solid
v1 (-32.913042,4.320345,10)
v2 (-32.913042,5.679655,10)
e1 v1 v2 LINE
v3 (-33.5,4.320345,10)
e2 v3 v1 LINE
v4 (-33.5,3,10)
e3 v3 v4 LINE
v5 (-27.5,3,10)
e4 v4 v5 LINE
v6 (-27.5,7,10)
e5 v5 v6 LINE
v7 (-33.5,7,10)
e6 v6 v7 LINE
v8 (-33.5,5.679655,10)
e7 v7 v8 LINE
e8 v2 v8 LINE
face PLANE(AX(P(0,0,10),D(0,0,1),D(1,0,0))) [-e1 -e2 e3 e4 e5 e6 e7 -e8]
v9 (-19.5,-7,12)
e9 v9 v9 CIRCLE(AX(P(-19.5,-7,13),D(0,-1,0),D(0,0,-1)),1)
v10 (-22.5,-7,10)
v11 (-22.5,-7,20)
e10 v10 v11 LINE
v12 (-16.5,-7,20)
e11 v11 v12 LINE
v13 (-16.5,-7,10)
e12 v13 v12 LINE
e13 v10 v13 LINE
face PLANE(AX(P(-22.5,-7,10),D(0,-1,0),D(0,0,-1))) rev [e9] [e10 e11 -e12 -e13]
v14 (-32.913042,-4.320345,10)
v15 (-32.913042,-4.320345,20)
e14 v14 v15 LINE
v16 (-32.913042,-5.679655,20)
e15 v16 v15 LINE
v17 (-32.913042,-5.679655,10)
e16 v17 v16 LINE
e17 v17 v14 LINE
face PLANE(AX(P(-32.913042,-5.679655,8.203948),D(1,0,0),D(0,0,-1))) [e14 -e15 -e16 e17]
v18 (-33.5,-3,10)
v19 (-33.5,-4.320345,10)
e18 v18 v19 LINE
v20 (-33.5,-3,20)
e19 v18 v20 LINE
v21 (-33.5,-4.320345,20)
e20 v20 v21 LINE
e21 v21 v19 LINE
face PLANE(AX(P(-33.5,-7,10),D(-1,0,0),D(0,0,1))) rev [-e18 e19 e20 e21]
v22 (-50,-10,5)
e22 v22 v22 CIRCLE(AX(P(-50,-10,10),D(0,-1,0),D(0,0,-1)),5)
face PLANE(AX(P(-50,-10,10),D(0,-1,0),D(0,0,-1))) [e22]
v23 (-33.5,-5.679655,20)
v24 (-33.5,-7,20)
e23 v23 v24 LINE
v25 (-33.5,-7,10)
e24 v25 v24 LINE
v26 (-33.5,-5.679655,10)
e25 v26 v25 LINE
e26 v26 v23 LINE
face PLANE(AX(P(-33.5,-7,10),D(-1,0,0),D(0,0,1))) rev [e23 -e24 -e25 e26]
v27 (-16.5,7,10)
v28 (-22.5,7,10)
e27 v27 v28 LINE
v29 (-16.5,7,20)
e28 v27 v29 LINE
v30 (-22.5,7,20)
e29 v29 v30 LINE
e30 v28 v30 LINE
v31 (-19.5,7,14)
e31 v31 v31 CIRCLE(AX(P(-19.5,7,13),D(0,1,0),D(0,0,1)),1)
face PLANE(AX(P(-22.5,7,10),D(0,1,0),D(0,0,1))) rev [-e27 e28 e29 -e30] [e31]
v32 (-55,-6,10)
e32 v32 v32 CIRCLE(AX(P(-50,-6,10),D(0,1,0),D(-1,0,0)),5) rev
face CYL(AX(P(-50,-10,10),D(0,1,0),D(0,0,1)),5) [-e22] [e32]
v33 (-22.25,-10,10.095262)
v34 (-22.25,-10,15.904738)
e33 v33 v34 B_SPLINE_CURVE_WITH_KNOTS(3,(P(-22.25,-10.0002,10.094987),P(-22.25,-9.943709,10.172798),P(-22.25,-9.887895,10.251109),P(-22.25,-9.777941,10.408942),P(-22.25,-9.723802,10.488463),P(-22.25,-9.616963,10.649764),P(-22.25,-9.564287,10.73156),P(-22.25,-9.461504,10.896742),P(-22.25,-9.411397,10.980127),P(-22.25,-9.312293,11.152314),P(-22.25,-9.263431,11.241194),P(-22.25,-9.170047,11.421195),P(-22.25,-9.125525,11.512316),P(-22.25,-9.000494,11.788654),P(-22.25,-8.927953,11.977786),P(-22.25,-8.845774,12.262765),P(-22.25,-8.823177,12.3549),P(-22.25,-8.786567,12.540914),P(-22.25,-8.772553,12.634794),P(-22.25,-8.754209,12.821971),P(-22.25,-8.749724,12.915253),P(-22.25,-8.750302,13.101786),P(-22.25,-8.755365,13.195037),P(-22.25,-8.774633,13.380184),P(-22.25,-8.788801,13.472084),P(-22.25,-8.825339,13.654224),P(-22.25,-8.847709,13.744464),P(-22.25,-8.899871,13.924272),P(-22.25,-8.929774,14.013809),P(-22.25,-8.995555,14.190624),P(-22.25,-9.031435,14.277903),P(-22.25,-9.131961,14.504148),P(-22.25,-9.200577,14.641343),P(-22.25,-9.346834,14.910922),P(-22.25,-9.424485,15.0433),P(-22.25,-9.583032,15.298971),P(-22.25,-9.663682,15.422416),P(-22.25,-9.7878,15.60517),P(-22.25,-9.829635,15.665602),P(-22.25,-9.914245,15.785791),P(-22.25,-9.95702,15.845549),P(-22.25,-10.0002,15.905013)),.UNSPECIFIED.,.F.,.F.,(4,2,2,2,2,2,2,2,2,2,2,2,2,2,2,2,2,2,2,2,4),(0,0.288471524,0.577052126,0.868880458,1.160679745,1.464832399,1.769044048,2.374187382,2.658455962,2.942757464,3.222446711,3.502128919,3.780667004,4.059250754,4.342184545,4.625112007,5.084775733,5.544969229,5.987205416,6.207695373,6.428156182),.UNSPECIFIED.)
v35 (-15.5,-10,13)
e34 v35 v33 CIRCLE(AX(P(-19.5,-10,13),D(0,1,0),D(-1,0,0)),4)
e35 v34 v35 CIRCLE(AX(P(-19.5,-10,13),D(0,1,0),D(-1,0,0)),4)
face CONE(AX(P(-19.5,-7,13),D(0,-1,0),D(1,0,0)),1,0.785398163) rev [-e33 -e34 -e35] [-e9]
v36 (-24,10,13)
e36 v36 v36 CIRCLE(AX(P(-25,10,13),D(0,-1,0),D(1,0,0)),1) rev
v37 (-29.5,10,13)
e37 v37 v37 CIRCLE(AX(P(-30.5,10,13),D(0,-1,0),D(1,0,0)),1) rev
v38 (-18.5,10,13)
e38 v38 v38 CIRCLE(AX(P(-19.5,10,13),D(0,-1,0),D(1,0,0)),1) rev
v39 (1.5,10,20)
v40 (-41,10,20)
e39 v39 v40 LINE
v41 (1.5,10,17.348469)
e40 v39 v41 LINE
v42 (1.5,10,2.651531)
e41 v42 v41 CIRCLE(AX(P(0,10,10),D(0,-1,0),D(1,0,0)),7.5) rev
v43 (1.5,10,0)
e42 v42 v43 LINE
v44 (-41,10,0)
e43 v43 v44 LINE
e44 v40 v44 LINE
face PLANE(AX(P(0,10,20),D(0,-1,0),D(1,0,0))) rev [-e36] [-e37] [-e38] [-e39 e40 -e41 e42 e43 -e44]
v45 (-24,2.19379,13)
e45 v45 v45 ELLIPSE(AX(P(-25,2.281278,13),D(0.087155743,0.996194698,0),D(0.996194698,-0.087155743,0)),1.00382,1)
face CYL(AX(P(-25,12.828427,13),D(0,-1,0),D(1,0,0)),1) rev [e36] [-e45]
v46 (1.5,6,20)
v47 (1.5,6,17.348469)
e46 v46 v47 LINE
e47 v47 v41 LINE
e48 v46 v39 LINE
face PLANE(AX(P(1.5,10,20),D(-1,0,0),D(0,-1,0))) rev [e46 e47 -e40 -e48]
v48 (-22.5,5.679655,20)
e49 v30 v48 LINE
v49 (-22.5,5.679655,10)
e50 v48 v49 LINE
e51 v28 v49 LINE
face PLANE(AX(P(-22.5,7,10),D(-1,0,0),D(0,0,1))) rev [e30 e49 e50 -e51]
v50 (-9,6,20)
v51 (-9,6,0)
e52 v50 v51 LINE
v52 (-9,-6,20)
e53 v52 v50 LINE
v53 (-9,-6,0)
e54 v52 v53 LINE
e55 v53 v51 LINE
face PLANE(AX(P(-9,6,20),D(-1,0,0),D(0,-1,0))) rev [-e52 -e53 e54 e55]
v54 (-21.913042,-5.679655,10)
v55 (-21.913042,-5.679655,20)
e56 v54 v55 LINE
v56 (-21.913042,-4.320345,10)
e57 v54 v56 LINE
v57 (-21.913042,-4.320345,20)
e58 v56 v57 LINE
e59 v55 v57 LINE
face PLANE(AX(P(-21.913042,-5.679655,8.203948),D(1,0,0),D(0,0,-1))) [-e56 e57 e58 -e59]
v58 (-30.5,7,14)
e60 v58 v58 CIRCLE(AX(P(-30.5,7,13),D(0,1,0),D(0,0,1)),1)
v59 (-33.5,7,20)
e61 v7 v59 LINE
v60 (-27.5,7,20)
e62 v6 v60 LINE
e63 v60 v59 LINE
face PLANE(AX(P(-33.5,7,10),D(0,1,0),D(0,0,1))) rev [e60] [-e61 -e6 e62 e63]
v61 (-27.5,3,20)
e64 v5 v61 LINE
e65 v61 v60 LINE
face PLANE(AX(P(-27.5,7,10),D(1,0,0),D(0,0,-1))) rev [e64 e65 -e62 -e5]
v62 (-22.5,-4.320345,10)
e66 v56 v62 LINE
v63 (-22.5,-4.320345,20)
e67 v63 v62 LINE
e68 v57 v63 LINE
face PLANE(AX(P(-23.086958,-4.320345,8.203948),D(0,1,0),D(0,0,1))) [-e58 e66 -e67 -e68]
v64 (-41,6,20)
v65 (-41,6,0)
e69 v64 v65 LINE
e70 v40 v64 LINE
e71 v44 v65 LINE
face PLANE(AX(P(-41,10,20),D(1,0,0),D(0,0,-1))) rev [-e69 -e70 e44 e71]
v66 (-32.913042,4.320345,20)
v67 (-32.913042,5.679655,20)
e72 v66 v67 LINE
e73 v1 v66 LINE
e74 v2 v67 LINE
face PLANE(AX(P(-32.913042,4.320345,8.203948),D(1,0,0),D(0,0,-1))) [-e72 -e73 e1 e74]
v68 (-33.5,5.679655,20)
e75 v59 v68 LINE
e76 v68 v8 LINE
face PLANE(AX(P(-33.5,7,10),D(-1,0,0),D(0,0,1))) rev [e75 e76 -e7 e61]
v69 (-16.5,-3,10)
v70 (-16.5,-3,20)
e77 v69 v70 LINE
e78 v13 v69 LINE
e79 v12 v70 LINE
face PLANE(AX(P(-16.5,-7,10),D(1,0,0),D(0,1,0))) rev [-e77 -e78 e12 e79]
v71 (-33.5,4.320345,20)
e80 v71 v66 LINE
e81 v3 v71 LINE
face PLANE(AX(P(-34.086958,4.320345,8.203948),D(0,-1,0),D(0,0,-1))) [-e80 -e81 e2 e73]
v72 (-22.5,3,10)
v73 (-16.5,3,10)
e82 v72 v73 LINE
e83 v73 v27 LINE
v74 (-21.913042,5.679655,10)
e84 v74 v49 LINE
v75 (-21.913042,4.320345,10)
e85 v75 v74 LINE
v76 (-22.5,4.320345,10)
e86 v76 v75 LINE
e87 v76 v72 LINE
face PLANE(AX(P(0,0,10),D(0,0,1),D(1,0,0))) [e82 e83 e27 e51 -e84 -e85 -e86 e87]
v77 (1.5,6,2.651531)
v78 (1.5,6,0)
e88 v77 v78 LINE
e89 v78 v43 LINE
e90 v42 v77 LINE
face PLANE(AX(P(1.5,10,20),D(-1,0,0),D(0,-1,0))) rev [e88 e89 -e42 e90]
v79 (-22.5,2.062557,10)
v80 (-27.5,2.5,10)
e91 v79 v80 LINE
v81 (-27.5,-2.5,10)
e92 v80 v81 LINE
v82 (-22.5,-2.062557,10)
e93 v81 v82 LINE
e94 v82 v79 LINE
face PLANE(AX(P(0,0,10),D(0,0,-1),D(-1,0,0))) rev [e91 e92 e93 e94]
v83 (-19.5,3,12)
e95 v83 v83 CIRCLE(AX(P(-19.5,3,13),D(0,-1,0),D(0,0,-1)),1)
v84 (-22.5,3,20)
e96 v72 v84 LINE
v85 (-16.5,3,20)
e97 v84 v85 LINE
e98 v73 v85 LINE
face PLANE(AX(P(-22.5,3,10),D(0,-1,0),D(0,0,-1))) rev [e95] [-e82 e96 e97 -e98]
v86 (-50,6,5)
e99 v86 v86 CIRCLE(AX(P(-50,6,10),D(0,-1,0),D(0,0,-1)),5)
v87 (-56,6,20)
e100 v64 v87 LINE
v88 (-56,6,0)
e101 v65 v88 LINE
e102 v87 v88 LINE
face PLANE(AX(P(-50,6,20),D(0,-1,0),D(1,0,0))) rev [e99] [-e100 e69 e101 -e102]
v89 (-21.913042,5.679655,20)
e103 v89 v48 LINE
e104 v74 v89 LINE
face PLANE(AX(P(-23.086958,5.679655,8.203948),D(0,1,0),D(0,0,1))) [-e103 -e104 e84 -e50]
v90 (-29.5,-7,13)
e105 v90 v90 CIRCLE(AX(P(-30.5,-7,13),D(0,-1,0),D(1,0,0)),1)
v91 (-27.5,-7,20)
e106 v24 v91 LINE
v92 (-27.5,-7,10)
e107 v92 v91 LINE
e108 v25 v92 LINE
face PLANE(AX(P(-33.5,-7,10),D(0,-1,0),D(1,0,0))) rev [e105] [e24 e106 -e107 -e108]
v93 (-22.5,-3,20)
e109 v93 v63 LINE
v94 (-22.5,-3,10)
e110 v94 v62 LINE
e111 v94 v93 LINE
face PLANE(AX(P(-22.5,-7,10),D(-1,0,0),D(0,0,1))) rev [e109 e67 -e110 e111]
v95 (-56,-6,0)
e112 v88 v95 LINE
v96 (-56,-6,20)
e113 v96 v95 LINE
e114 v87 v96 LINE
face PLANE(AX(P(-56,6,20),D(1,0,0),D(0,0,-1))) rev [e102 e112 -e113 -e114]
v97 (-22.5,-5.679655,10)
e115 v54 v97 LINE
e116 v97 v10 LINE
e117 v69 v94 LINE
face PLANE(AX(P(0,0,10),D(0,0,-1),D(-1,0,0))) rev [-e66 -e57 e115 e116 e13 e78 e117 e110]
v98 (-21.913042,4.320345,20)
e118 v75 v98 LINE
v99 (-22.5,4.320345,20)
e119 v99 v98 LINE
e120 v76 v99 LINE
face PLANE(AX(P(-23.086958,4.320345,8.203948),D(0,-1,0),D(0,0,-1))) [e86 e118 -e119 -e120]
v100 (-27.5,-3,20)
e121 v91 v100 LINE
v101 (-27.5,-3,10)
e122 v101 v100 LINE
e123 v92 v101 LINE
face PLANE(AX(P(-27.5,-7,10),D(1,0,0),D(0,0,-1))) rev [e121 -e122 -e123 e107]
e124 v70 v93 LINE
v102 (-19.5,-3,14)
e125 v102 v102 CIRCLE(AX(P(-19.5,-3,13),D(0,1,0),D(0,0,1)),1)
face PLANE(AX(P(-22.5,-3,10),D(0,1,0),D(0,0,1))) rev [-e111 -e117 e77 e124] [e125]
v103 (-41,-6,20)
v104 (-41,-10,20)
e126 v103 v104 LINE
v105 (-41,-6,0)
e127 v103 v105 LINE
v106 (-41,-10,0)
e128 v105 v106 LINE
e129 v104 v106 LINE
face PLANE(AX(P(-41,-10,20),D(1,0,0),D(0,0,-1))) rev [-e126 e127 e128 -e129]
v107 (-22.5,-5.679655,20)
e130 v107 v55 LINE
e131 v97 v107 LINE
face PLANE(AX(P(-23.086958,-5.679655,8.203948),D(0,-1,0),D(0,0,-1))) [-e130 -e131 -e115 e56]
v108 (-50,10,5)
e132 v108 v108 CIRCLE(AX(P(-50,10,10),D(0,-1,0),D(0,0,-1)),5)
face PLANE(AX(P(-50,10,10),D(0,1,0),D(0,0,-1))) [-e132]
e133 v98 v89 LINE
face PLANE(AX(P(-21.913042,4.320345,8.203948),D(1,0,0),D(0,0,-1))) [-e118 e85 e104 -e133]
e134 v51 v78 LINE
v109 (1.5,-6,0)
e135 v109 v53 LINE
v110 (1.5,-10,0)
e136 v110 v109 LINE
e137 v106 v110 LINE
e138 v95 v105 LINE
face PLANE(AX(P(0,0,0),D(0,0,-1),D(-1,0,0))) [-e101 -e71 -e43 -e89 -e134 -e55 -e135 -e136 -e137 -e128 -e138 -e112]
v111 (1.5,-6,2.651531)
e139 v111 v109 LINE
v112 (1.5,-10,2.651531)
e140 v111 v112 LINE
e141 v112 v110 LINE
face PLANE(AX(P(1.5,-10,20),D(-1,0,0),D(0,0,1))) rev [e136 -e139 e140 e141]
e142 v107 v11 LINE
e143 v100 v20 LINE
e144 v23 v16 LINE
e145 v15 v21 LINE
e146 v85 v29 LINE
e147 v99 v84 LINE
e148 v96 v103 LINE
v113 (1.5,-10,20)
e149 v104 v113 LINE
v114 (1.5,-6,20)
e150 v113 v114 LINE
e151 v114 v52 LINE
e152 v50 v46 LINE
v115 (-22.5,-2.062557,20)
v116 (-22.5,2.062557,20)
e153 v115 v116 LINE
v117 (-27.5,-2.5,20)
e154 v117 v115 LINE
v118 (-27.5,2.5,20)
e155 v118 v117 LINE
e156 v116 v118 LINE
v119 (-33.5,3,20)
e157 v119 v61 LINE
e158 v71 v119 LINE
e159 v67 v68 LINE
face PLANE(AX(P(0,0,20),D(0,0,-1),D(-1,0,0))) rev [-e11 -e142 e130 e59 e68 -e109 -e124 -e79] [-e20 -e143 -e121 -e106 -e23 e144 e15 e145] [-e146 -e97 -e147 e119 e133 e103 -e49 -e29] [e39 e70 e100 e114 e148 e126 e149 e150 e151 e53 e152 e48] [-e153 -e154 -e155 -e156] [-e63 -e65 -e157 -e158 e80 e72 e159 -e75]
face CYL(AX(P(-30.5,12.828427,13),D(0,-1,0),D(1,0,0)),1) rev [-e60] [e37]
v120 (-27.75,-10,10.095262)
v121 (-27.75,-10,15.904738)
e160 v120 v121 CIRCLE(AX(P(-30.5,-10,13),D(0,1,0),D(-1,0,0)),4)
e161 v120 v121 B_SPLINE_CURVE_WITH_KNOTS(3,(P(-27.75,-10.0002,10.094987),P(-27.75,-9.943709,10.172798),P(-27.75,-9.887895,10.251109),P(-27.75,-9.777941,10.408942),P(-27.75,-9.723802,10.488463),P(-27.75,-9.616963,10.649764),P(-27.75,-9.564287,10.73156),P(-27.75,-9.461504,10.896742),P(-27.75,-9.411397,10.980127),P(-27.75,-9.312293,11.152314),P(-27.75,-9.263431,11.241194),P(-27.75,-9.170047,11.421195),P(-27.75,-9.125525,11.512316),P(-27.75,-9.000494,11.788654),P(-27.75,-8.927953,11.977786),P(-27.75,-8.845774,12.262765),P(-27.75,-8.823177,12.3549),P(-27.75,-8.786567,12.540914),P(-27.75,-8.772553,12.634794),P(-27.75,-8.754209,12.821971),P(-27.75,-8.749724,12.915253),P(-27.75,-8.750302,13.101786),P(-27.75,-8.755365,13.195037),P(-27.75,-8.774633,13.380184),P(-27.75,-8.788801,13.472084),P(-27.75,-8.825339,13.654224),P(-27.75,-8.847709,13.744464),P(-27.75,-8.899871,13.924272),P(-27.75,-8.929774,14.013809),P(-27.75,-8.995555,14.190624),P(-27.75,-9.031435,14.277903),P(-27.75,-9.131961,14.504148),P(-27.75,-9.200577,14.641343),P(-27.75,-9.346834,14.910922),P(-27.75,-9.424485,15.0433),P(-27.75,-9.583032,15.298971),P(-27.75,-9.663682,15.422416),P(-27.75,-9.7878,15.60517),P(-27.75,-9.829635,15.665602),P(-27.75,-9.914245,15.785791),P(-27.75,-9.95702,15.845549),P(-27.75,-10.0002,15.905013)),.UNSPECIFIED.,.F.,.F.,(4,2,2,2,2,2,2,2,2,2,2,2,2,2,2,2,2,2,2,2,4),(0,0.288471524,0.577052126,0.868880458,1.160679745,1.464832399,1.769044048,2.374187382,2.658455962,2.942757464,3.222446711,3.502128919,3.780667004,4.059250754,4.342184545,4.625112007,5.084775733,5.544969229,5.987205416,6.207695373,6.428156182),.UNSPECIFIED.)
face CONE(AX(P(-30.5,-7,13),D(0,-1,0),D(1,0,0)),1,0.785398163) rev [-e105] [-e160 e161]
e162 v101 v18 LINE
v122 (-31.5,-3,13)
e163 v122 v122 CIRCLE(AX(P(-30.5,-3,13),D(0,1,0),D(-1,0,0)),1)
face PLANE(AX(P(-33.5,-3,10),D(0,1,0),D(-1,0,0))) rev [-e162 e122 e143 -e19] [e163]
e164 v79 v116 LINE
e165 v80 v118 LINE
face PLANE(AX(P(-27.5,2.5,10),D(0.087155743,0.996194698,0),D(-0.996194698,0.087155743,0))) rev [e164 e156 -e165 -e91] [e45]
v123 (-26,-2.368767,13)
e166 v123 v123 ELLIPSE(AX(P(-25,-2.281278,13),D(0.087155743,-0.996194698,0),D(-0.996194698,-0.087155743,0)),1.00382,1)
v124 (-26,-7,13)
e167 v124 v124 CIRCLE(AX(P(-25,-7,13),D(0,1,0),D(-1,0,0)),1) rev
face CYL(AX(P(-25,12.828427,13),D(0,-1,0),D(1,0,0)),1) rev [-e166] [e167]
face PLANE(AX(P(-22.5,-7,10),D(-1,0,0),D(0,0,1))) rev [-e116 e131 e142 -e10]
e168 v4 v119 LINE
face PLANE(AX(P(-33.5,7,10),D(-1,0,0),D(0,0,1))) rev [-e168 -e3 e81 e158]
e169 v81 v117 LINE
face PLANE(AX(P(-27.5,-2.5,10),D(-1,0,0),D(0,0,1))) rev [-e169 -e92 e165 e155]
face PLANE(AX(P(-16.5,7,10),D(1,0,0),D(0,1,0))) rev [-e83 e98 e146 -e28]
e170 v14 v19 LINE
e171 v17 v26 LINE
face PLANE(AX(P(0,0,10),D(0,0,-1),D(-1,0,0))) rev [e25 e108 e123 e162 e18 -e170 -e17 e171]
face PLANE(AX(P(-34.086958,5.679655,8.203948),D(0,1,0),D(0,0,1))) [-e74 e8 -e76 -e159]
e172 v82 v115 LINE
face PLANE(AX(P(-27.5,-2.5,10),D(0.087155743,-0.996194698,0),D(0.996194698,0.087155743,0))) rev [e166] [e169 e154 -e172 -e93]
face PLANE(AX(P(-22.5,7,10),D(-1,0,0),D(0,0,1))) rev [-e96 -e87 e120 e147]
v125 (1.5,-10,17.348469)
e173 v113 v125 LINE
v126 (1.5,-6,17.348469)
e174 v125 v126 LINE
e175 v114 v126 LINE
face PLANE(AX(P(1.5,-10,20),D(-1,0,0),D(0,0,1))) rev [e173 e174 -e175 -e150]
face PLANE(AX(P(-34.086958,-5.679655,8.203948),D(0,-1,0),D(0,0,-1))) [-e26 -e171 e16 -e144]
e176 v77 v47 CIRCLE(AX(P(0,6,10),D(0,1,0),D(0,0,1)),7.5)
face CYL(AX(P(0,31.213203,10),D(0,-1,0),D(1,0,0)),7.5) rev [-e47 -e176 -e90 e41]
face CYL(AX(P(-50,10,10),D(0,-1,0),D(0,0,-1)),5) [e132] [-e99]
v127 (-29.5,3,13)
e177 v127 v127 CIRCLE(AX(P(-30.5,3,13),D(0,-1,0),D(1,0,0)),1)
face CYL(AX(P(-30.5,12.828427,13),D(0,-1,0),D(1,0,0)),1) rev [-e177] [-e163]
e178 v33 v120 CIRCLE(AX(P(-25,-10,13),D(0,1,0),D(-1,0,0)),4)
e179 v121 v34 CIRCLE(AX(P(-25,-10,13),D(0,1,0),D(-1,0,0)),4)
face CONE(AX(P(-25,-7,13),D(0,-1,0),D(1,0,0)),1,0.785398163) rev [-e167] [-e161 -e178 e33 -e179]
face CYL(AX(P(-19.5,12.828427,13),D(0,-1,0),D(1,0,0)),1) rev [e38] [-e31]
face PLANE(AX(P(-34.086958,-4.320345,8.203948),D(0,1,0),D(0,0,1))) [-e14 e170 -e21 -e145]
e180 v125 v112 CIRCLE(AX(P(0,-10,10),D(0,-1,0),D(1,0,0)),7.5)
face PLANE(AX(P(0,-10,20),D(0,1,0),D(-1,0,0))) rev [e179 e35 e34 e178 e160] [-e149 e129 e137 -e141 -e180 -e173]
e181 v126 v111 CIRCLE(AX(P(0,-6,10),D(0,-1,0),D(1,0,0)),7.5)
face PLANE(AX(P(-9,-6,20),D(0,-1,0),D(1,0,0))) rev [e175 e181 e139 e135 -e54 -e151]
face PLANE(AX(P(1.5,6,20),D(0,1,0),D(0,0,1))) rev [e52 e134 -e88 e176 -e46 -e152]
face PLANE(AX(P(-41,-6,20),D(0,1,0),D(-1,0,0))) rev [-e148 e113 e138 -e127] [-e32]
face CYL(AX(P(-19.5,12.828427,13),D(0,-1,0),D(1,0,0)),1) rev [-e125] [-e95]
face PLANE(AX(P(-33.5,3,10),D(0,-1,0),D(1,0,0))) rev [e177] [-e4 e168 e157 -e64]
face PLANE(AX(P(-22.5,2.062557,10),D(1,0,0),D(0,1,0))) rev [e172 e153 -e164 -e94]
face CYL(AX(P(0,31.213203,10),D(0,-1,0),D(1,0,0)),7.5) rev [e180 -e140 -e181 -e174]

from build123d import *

# Parameters (mm, degrees)
BOSS_EXTRUDE1_DEPTH = 20
SKETCH2_R           = 5
BOSS_EXTRUDE2_DEPTH = 4
CUT_EXTRUDE1_REACH  = 64.738
SKETCH3_R           = 7.5
CUT_EXTRUDE2_DEPTH  = 10
SKETCH5_W           = 6
SKETCH5_H           = 4
CUT_EXTRUDE3_DEPTH  = 10
CUT_EXTRUDE4_REACH  = 64.738
SKETCH6_R           = 1
CHAMFER1_SIZE       = 3
SKETCH7_W           = 1.173916184
SKETCH7_H           = 1.359310186
BOSS_EXTRUDE3_DEPTH = 10


with BuildPart() as part:
    # Sketch1 → Boss-Extrude1 (new body)
    with BuildSketch(Plane.XY):
        Polygon((-41, -10), (-41, -6), (-50, -6), (-56, -6), (-56, 6), (-50, 6), (-41, 6), (-41, 10), (0, 10), (1.5, 10), (1.5, 6), (0, 6), (-9, 6), (-9, -6), (0, -6), (1.5, -6), (1.5, -10), (0, -10), align=None)
    extrude(amount=BOSS_EXTRUDE1_DEPTH)

    # Sketch2 → Boss-Extrude2 (add)
    with BuildSketch(Plane.XZ.offset(6)):
        with Locations(Location((-50, 10, 0), (0, 0, 180))):
            Circle(SKETCH2_R)
    boss_extrude2 = extrude(amount=BOSS_EXTRUDE2_DEPTH)

    # Cut-Extrude1: up to this face of the body (flat: up to its plane)
    cut_extrude1_end = Plane(part.part.faces().sort_by_distance((-19.75, 10, 10))[0])
    # Sketch3 → Cut-Extrude1 (cut, up to the picked face)
    with BuildSketch(Plane.XZ.offset(10), mode=Mode.PRIVATE) as cut_extrude1_sk1:
        with Locations((0, 10)):
            Circle(SKETCH3_R)
    cut_extrude1_tool1 = split(extrude(cut_extrude1_sk1.sketch, amount=-CUT_EXTRUDE1_REACH, mode=Mode.PRIVATE), bisect_by=cut_extrude1_end, keep=Keep.BOTH, mode=Mode.PRIVATE)
    add(cut_extrude1_tool1.solids().sort_by(Axis((0, -10, 10), (0, 1, 0)))[0], mode=Mode.SUBTRACT)

    # Mirror1: Boss-Extrude2 across plane
    add(boss_extrude2.mirror(Plane.ZX))

    # Sketch4 → Cut-Extrude2 (cut)
    with BuildSketch(Plane.XY.offset(20)):
        Polygon((-27.5, 2.5), (-22.5, 2.062556682), (-22.5, -2.062556682), (-27.5, -2.5), align=None)
    extrude(amount=-CUT_EXTRUDE2_DEPTH, mode=Mode.SUBTRACT)

    # Sketch5 → Cut-Extrude3 (cut)
    with BuildSketch(Plane.XY.offset(20)):
        with Locations((-30.5, 5)):
            Rectangle(SKETCH5_W, SKETCH5_H)
        with Locations((-19.5, 5)):
            Rectangle(SKETCH5_W, SKETCH5_H)
        with Locations((-19.5, -5)):
            Rectangle(SKETCH5_W, SKETCH5_H)
        with Locations((-30.5, -5)):
            Rectangle(SKETCH5_W, SKETCH5_H)
    extrude(amount=-CUT_EXTRUDE3_DEPTH, mode=Mode.SUBTRACT)

    # Cut-Extrude4: up to this face of the body (flat: up to its plane)
    cut_extrude4_end = Plane(part.part.faces().sort_by_distance((-22.349651974, 10, 10))[0])
    # Sketch6 → Cut-Extrude4 (cut, up to the picked face)
    with BuildSketch(Plane.XZ.offset(10), mode=Mode.PRIVATE) as cut_extrude4_sk1:
        with Locations((-30.5, 13)):
            Circle(SKETCH6_R)
    cut_extrude4_tool1 = split(extrude(cut_extrude4_sk1.sketch, amount=-CUT_EXTRUDE4_REACH, mode=Mode.PRIVATE), bisect_by=cut_extrude4_end, keep=Keep.BOTH, mode=Mode.PRIVATE)
    # Sketch6 → Cut-Extrude4 (cut, up to the picked face)
    with BuildSketch(Plane.XZ.offset(10), mode=Mode.PRIVATE) as cut_extrude4_sk2:
        with Locations((-25, 13)):
            Circle(SKETCH6_R)
    cut_extrude4_tool2 = split(extrude(cut_extrude4_sk2.sketch, amount=-CUT_EXTRUDE4_REACH, mode=Mode.PRIVATE), bisect_by=cut_extrude4_end, keep=Keep.BOTH, mode=Mode.PRIVATE)
    # Sketch6 → Cut-Extrude4 (cut, up to the picked face)
    with BuildSketch(Plane.XZ.offset(10), mode=Mode.PRIVATE) as cut_extrude4_sk3:
        with Locations(Location((-19.5, 13, 0), (0, 0, 270))):
            Circle(SKETCH6_R)
    cut_extrude4_tool3 = split(extrude(cut_extrude4_sk3.sketch, amount=-CUT_EXTRUDE4_REACH, mode=Mode.PRIVATE), bisect_by=cut_extrude4_end, keep=Keep.BOTH, mode=Mode.PRIVATE)
    add(cut_extrude4_tool1.solids().sort_by(Axis((-30.5, -10, 13), (0, 1, 0)))[0], mode=Mode.SUBTRACT)
    add(cut_extrude4_tool2.solids().sort_by(Axis((-25, -10, 13), (0, 1, 0)))[0], mode=Mode.SUBTRACT)
    add(cut_extrude4_tool3.solids().sort_by(Axis((-19.5, -10, 13), (0, 1, 0)))[0], mode=Mode.SUBTRACT)

    # Chamfer1
    # the kernel refuses this chamfer: 3 mm, written as the material it takes off along each edge
    with BuildSketch(Plane(origin=(-30.5, -10, 13), x_dir=(1, 0, 0), z_dir=(0, 0, -1))) as chamfer1_piece_1:
        Polygon((1 + CHAMFER1_SIZE, 0), (1, -CHAMFER1_SIZE), (1, 0), align=None)
    revolve(axis=Axis((-30.5, -10, 13), (0, -1, 0)), mode=Mode.SUBTRACT)
    with BuildSketch(Plane(origin=(-25, -10, 13), x_dir=(1, 0, 0), z_dir=(0, 0, -1))) as chamfer1_piece_2:
        Polygon((1 + CHAMFER1_SIZE, 0), (1, -CHAMFER1_SIZE), (1, 0), align=None)
    revolve(axis=Axis((-25, -10, 13), (0, -1, 0)), mode=Mode.SUBTRACT)
    with BuildSketch(Plane(origin=(-19.5, -10, 13), x_dir=(0, 0, -1), z_dir=(-1, 0, 0))) as chamfer1_piece_3:
        Polygon((1 + CHAMFER1_SIZE, 0), (1, -CHAMFER1_SIZE), (1, 0), align=None)
    revolve(axis=Axis((-19.5, -10, 13), (0, -1, 0)), mode=Mode.SUBTRACT)

    # Sketch7 → Boss-Extrude3 (add)
    with BuildSketch(Plane.XY.offset(20)):
        with Locations((-22.5, -5)):
            Rectangle(SKETCH7_W, SKETCH7_H)
        with Locations((-33.5, -5)):
            Rectangle(SKETCH7_W, SKETCH7_H)
        with Locations((-33.5, 5)):
            Rectangle(SKETCH7_W, SKETCH7_H)
        with Locations((-22.5, 5)):
            Rectangle(SKETCH7_W, SKETCH7_H)
    extrude(amount=-BOSS_EXTRUDE3_DEPTH)


solid = part.part
